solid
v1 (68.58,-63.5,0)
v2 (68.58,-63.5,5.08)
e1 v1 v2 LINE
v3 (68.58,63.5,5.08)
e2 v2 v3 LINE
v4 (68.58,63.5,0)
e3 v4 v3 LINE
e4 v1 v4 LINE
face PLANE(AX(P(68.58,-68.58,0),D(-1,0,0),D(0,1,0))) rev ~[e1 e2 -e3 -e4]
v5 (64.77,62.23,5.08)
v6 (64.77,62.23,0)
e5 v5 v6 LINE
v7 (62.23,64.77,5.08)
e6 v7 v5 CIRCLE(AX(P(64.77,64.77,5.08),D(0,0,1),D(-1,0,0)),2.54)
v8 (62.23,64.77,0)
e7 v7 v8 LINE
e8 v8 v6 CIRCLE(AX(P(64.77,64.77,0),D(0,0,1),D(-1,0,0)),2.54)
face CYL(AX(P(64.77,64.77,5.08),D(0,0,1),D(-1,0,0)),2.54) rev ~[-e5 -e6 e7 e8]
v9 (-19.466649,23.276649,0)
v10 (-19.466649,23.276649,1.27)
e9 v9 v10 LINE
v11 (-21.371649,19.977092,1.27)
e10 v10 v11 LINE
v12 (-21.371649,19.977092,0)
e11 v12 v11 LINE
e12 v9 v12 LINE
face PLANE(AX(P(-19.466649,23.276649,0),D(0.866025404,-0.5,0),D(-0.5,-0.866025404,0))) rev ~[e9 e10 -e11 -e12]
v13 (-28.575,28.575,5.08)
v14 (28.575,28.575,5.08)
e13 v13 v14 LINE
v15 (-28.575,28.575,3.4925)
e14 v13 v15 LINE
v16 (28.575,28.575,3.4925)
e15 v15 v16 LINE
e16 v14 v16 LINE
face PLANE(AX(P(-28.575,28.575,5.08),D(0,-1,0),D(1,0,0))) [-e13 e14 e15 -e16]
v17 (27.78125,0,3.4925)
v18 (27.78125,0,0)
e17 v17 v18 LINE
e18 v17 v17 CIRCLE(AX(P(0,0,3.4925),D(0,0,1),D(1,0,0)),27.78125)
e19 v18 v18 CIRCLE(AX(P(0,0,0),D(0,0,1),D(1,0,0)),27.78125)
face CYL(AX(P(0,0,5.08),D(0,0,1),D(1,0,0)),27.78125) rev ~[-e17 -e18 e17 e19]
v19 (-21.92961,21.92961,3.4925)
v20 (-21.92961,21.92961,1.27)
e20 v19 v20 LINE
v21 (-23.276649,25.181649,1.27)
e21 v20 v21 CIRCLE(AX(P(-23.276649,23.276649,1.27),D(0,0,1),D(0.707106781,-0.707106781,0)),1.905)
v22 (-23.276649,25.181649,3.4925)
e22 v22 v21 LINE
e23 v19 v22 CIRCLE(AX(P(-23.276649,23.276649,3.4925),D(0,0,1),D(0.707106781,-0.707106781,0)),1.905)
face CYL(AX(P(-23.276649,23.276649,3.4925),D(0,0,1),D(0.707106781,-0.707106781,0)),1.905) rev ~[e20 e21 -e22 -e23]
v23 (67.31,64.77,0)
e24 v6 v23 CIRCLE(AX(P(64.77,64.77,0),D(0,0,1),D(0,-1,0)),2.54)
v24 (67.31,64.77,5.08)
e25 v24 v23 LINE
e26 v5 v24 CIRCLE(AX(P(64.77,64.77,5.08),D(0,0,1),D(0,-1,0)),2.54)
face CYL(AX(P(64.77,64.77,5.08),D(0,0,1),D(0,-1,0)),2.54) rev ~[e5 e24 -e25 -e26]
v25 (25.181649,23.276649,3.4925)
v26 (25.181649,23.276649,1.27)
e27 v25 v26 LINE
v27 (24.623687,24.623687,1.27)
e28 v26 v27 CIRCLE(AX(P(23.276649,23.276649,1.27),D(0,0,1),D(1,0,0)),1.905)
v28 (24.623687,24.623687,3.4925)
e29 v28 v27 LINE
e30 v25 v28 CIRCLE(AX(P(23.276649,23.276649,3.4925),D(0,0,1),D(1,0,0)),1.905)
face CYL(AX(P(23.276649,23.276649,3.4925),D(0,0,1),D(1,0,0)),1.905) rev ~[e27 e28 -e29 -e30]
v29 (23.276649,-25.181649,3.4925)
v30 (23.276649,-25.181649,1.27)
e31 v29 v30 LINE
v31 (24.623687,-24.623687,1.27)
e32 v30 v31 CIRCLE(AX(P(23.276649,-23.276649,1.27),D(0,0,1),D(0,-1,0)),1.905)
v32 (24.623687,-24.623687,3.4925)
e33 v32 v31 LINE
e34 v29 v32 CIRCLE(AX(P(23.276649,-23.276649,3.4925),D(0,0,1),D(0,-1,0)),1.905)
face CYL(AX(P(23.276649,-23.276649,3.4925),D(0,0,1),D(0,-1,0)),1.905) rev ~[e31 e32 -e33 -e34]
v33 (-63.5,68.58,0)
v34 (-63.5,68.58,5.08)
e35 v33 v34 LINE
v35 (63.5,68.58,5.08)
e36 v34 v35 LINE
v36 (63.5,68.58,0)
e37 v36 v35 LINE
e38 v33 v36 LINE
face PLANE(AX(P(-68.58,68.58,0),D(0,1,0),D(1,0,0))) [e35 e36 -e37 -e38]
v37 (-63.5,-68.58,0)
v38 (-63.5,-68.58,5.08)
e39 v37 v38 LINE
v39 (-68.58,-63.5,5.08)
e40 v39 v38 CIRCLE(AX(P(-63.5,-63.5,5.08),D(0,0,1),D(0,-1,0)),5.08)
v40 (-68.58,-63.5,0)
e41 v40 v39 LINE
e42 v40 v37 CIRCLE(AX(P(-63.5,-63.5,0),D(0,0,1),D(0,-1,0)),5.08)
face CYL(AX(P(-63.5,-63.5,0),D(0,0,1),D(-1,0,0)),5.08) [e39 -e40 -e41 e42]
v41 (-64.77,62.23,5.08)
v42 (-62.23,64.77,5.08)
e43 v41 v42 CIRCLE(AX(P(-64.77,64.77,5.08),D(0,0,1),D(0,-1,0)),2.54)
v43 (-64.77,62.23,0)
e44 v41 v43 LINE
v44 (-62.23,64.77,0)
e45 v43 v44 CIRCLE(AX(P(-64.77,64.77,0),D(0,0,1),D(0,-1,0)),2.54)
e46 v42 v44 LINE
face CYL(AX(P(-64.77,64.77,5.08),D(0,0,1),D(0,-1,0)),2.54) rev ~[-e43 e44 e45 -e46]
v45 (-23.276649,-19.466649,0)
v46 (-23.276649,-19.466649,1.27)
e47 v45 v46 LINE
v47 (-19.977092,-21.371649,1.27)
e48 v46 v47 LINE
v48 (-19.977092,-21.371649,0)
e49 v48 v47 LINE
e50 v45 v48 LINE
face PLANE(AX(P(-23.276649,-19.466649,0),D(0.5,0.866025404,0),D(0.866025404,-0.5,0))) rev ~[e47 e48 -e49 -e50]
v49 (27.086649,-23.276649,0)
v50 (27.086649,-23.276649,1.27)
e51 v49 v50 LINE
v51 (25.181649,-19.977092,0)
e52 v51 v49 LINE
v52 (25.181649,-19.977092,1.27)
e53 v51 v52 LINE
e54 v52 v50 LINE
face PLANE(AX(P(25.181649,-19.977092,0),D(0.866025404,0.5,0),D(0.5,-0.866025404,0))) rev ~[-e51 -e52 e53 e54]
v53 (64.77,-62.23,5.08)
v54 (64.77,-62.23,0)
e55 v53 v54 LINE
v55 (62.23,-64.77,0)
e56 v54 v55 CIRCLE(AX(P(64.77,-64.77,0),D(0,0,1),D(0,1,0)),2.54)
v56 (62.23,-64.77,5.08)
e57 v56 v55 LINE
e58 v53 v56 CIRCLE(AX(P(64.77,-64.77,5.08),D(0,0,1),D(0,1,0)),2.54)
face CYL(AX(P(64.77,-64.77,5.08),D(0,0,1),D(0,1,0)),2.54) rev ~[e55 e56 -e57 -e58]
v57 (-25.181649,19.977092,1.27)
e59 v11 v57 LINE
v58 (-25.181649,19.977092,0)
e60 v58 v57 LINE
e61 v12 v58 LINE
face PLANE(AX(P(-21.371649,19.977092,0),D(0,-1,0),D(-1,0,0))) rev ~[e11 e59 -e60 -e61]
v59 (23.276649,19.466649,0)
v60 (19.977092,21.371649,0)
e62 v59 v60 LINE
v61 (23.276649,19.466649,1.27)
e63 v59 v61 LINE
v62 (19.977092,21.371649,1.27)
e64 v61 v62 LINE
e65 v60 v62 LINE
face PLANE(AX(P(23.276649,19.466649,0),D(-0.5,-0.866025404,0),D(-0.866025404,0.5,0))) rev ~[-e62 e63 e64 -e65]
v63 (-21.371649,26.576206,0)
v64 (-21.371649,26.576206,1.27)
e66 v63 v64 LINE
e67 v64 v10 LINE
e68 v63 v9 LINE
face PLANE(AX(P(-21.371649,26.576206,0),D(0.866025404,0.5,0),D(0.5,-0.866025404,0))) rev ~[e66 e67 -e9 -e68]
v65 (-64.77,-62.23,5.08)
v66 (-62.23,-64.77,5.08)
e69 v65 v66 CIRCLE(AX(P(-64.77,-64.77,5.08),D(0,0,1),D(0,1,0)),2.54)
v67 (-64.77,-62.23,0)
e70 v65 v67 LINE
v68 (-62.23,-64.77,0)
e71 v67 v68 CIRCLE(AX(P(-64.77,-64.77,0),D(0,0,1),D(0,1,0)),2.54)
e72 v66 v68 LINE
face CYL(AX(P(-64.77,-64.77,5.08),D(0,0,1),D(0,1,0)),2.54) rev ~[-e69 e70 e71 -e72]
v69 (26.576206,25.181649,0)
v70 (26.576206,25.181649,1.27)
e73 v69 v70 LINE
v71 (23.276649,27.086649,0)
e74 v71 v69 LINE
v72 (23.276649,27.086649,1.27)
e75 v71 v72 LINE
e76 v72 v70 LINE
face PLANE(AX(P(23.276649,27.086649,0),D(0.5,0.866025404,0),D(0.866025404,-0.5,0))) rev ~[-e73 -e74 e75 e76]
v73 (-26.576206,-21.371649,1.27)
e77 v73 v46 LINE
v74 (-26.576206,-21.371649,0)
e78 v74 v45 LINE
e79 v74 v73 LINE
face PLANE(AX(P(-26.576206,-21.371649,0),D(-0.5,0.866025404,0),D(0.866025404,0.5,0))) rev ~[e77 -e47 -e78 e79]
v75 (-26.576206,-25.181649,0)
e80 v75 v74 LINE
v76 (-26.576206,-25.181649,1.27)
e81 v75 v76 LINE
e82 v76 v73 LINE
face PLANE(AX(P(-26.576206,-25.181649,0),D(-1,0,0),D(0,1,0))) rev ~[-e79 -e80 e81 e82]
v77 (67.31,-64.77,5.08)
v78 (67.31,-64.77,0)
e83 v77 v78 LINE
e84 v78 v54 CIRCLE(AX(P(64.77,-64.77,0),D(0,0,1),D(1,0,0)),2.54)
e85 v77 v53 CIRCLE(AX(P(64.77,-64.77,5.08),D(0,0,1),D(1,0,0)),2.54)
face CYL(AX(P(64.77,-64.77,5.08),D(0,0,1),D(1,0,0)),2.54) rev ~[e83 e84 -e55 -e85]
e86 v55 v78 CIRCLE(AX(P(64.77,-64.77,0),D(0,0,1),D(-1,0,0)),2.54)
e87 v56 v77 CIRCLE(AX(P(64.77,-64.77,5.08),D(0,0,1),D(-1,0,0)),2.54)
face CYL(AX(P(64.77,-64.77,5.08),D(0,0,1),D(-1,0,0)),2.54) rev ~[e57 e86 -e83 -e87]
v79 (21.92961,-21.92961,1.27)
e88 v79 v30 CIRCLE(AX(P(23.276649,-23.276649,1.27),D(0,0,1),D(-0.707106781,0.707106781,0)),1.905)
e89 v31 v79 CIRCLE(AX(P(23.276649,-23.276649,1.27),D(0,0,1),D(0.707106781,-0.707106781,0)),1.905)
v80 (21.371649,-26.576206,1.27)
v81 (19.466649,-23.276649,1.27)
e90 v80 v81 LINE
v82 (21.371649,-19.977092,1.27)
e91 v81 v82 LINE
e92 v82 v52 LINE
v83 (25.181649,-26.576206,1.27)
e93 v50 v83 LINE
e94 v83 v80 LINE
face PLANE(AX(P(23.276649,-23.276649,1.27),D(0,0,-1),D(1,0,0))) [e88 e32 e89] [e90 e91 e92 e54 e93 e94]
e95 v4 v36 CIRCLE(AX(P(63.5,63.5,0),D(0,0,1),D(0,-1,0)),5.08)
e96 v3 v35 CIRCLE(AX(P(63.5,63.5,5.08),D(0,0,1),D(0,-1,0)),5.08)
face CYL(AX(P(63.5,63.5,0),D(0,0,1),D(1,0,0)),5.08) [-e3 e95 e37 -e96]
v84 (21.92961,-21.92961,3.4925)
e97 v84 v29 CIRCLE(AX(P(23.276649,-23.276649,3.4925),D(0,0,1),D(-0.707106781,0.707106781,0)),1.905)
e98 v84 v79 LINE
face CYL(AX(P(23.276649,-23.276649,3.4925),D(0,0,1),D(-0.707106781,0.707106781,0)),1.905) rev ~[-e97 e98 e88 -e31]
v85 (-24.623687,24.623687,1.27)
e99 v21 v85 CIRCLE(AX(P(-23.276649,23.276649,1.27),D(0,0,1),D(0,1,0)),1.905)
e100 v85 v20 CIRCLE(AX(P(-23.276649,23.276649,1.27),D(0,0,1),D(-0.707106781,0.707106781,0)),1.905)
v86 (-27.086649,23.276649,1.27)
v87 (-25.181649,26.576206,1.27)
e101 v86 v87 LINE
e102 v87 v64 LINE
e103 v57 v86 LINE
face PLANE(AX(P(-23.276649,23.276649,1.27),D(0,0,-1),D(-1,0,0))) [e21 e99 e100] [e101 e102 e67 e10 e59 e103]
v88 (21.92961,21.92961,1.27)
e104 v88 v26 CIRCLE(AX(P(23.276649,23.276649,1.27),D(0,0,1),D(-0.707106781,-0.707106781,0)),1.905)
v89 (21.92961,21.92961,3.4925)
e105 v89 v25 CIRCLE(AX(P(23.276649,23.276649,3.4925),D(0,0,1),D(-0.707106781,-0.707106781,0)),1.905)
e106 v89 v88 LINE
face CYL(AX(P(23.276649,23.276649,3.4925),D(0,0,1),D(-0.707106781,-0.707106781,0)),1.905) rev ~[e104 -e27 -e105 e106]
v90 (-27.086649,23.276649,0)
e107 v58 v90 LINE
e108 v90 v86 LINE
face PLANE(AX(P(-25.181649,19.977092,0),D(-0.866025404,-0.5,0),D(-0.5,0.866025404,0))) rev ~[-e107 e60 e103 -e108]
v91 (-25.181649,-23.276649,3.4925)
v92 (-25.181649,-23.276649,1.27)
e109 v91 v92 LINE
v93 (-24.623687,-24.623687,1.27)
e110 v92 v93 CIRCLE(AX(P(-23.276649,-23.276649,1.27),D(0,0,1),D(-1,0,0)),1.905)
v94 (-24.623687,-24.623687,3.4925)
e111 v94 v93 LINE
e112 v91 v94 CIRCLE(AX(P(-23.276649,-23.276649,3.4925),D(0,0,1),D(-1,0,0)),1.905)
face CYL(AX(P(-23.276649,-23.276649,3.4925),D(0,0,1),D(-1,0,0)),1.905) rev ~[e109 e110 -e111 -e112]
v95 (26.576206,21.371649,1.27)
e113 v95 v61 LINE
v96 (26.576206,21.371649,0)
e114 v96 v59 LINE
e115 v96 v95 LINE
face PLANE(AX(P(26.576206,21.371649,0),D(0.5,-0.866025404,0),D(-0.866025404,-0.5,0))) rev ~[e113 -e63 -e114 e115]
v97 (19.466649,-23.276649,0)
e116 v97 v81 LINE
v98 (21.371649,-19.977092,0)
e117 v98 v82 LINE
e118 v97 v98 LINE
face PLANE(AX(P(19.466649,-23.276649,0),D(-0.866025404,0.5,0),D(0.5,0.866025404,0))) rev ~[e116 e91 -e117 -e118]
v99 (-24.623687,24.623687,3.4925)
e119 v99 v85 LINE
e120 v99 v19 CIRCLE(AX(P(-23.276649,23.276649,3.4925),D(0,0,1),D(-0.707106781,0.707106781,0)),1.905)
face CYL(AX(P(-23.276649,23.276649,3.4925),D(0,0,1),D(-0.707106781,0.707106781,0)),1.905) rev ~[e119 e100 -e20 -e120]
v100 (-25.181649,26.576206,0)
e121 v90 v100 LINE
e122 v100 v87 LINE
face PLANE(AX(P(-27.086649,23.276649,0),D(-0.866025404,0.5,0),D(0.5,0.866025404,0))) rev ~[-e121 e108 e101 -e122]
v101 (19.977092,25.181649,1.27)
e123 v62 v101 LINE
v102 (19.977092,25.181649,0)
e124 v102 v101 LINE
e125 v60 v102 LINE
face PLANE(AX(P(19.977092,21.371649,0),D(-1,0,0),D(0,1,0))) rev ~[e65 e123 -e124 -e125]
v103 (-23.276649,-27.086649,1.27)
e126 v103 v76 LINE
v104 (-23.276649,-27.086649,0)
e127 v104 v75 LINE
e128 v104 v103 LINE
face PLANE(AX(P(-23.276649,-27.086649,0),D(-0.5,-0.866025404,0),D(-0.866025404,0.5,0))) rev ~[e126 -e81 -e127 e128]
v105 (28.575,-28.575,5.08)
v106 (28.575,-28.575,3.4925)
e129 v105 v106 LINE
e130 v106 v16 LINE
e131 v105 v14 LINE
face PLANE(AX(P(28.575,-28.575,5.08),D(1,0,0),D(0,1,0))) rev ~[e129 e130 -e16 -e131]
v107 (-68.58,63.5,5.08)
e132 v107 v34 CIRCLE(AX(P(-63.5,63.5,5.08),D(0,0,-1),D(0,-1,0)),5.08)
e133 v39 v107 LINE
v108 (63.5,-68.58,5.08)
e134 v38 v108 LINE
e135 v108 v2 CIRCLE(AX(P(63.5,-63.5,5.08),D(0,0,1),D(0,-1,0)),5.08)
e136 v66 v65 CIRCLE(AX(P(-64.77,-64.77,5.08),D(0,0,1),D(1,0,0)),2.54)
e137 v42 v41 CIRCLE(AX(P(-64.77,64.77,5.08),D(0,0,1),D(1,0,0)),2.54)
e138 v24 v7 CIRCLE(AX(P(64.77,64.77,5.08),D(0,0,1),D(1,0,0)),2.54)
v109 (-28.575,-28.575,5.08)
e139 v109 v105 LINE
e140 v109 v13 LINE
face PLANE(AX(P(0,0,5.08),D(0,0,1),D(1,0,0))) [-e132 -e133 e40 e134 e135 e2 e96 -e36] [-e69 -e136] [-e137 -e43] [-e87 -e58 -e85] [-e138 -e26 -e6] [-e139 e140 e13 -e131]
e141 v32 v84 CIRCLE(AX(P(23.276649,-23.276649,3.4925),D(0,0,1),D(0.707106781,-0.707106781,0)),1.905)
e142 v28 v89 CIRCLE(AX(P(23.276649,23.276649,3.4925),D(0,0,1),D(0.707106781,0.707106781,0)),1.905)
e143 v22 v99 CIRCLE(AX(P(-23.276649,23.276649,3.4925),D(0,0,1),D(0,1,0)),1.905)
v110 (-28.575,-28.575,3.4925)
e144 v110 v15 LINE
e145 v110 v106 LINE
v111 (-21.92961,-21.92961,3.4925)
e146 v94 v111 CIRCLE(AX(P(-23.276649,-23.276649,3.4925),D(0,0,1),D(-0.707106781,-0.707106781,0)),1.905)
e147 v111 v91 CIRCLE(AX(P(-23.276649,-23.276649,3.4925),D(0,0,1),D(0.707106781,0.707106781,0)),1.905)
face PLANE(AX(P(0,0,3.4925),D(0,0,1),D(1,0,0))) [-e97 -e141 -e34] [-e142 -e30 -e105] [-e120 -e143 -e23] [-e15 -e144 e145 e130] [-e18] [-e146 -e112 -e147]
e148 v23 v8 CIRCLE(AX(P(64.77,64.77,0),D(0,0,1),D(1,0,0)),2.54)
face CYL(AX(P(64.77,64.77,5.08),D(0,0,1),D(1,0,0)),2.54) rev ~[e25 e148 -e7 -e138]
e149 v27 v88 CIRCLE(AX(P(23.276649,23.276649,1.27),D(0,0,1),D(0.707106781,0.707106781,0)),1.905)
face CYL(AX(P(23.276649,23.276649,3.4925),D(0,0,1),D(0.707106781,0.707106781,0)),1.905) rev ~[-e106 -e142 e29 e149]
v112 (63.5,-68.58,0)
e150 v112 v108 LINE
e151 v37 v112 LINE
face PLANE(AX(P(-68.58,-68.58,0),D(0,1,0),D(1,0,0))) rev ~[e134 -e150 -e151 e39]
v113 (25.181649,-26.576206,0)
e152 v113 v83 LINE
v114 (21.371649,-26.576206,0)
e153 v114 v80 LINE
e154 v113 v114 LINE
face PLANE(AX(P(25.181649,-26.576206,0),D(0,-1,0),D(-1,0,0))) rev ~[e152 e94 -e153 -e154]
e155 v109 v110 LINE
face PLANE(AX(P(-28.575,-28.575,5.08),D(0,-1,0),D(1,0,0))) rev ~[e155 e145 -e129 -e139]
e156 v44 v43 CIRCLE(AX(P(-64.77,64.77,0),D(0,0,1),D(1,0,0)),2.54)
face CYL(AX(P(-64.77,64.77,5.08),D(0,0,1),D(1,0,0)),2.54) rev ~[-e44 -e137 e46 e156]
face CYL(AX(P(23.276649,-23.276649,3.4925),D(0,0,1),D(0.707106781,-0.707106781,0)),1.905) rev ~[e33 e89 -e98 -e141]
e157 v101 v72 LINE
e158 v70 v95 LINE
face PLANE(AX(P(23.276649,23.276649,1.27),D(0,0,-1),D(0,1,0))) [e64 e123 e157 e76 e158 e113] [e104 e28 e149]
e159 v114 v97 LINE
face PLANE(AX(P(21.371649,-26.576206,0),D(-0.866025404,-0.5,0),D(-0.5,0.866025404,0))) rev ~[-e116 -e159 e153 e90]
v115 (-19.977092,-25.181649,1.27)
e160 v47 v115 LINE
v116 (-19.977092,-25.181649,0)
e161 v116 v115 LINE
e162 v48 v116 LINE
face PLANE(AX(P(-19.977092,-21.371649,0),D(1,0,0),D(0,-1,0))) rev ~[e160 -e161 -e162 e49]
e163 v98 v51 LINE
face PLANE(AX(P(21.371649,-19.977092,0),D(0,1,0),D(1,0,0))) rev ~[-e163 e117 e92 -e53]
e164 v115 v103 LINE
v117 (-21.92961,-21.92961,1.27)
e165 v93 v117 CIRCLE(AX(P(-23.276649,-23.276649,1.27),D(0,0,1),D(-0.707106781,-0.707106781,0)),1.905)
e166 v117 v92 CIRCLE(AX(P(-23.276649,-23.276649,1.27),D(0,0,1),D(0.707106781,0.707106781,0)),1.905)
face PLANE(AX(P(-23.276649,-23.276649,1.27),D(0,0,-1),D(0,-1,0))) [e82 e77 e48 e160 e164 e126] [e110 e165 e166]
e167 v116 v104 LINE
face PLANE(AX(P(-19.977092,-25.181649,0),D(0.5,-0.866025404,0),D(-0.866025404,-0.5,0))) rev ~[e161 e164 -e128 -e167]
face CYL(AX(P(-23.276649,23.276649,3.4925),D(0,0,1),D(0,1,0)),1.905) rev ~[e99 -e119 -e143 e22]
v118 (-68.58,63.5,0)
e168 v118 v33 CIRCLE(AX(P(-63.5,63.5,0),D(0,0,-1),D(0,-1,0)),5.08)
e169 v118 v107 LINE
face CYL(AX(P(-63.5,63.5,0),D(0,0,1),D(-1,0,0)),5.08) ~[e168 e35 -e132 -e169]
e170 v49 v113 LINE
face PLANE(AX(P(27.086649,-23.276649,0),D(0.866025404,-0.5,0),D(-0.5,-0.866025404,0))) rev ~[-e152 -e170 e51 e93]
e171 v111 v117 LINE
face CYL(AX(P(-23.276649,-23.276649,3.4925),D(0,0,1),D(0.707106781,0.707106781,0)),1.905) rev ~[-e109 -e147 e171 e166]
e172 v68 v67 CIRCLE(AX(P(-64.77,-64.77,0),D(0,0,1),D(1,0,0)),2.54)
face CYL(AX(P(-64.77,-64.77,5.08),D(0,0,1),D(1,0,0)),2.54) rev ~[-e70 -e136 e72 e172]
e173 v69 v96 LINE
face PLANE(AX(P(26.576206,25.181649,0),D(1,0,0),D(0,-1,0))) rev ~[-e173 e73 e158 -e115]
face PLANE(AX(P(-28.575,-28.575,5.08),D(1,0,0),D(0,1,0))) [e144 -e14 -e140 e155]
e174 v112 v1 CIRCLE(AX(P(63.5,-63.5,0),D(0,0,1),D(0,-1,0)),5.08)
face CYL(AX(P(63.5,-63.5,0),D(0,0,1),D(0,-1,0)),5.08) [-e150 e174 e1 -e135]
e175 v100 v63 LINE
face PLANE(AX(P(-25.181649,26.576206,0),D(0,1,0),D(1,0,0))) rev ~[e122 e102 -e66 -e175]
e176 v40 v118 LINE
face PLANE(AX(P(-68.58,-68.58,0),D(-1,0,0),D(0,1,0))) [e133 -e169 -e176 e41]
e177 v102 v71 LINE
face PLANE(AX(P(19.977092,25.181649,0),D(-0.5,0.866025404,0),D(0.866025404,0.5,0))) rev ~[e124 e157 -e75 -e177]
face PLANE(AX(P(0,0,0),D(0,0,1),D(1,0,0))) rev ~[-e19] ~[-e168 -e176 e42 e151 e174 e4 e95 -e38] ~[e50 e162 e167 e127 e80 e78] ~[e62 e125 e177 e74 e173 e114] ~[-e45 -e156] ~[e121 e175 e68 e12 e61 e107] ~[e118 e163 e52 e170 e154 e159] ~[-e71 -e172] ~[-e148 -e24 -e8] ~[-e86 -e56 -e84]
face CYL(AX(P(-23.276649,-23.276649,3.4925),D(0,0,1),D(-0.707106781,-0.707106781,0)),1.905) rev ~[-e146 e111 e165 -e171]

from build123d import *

# Parameters (mm, degrees)
F0_W             = 137.16
F0_H             = 137.16
F1_DEPTH         = 5.08
F2_R             = 5.08
F3_R             = 27.78125
F4_DEPTH         = 5.08
F5_W             = 57.15
F5_H             = 57.15
F6_DEPTH         = 1.5875
F8_DEPTH         = 3.4925
F8_COPIES_COUNT  = 4
F11_DEPTH        = 1.27
F11_COPIES_COUNT = 4
F13_DEPTH        = 5.08


# Not quite as in the source:
# - a pattern or mirror of a feature is missing from the dataset's text; its kind, count and spacing are read off the source's solid


with BuildPart() as f1:
    # F0 (on Top) → F1 (new body)
    with BuildSketch(Plane.XY):
        Rectangle(F0_W, F0_H)
    extrude(amount=F1_DEPTH)

    # F2
    f2_edges = [f1.edges().sort_by_distance(p)[0] for p in [
        (-68.58, -68.58, 2.54),
        (68.58, -68.58, 2.54),
        (68.58, 68.58, 2.54),
        (-68.58, 68.58, 2.54),
    ]]
    fillet(f2_edges, radius=F2_R)

    # F3 (on face) → F4 (cut, through all)
    with BuildSketch(Plane.XY.offset(5.08)):
        Circle(F3_R)
    extrude(amount=-F4_DEPTH, mode=Mode.SUBTRACT)

    # F5 (on face) → F6 (cut)
    with BuildSketch(Plane.XY.offset(5.08)):
        Rectangle(F5_W, F5_H)
    extrude(amount=-F6_DEPTH, mode=Mode.SUBTRACT)

    # F7 (on face) → F8 (cut, through all)
    with BuildSketch(Plane.XY.offset(3.4925)):
        with BuildLine():
            Line((21.9296104704, 21.9296104704), (24.6236873067, 24.6236873067))
            ThreePointArc((24.6236873067, 24.6236873067), (21.9296104704, 24.6236873067), (21.9296104704, 21.9296104704))
        make_face()
        with BuildLine():
            ThreePointArc((25.1816488886, 23.2766488886), (25.036639398, 24.0056608272), (24.6236873067, 24.6236873067))
            Line((24.6236873067, 24.6236873067), (21.9296104704, 21.9296104704))
            ThreePointArc((21.9296104704, 21.9296104704), (24.0056608272, 21.5166583791), (25.1816488886, 23.2766488886))
        make_face()
    f8 = extrude(amount=-F8_DEPTH, mode=Mode.SUBTRACT)

    # F8_copies: F8 ×4 about axis
    f8_copies_axis = Axis((0, 0, 0), (0, 0, 1))
    for i in range(1, F8_COPIES_COUNT):
        add(f8.rotate(f8_copies_axis, i * 360 / F8_COPIES_COUNT), mode=Mode.SUBTRACT)

    # F10 (on face) → F11 (cut)
    with BuildSketch(Plane(origin=(0, 0, 0), x_dir=(1, 0, 0), z_dir=(0, 0, -1))):
        Polygon((27.0866488886, 23.2766488886), (25.1816488886, 26.576205677), (21.3716488886, 26.576205677), (19.4666488886, 23.2766488886), (21.3716488886, 19.9770921002), (25.1816488886, 19.9770921002), align=None)
    f11 = extrude(amount=-F11_DEPTH, mode=Mode.SUBTRACT)

    # F11_copies: F11 ×4 about axis
    f11_copies_axis = Axis((0, 0, 0), (0, 0, 1))
    for i in range(1, F11_COPIES_COUNT):
        add(f11.rotate(f11_copies_axis, i * 360 / F11_COPIES_COUNT), mode=Mode.SUBTRACT)

    # F12 (on face) → F13 (cut, through all)
    with BuildSketch(Plane.XY.offset(5.08)):
        with BuildLine():
            Line((-64.77, 64.77), (-62.23, 64.77))
            ThreePointArc((-62.23, 64.77), (-66.5660512242, 66.5660512242), (-64.77, 62.23))
            Line((-64.77, 62.23), (-64.77, 64.77))
        make_face()
        with BuildLine():
            ThreePointArc((-64.77, 62.23), (-62.9739487758, 62.9739487758), (-62.23, 64.77))
            Line((-62.23, 64.77), (-64.77, 64.77))
            Line((-64.77, 64.77), (-64.77, 62.23))
        make_face()
        with BuildLine():
            Line((-64.77, -64.77), (-64.77, -62.23))
            ThreePointArc((-64.77, -62.23), (-66.5660512242, -66.5660512242), (-62.23, -64.77))
            Line((-62.23, -64.77), (-64.77, -64.77))
        make_face()
        with BuildLine():
            ThreePointArc((-62.23, -64.77), (-62.9739487758, -62.9739487758), (-64.77, -62.23))
            Line((-64.77, -62.23), (-64.77, -64.77))
            Line((-64.77, -64.77), (-62.23, -64.77))
        make_face()
        with BuildLine():
            ThreePointArc((67.31, -64.77), (66.5660512242, -62.9739487758), (64.77, -62.23))
            Line((64.77, -62.23), (64.77, -64.77))
            Line((64.77, -64.77), (62.23, -64.77))
            ThreePointArc((62.23, -64.77), (64.77, -67.31), (67.31, -64.77))
        make_face()
        with BuildLine():
            Line((64.77, -64.77), (64.77, -62.23))
            ThreePointArc((64.77, -62.23), (62.9739487758, -62.9739487758), (62.23, -64.77))
            Line((62.23, -64.77), (64.77, -64.77))
        make_face()
        with BuildLine():
            Line((64.77, 64.77), (62.23, 64.77))
            ThreePointArc((62.23, 64.77), (62.9739487758, 62.9739487758), (64.77, 62.23))
            Line((64.77, 62.23), (64.77, 64.77))
        make_face()
        with BuildLine():
            ThreePointArc((67.31, 64.77), (64.77, 67.31), (62.23, 64.77))
            Line((62.23, 64.77), (64.77, 64.77))
            Line((64.77, 64.77), (64.77, 62.23))
            ThreePointArc((64.77, 62.23), (66.5660512242, 62.9739487758), (67.31, 64.77))
        make_face()
    extrude(amount=-F13_DEPTH, mode=Mode.SUBTRACT)


solid = f1.part
